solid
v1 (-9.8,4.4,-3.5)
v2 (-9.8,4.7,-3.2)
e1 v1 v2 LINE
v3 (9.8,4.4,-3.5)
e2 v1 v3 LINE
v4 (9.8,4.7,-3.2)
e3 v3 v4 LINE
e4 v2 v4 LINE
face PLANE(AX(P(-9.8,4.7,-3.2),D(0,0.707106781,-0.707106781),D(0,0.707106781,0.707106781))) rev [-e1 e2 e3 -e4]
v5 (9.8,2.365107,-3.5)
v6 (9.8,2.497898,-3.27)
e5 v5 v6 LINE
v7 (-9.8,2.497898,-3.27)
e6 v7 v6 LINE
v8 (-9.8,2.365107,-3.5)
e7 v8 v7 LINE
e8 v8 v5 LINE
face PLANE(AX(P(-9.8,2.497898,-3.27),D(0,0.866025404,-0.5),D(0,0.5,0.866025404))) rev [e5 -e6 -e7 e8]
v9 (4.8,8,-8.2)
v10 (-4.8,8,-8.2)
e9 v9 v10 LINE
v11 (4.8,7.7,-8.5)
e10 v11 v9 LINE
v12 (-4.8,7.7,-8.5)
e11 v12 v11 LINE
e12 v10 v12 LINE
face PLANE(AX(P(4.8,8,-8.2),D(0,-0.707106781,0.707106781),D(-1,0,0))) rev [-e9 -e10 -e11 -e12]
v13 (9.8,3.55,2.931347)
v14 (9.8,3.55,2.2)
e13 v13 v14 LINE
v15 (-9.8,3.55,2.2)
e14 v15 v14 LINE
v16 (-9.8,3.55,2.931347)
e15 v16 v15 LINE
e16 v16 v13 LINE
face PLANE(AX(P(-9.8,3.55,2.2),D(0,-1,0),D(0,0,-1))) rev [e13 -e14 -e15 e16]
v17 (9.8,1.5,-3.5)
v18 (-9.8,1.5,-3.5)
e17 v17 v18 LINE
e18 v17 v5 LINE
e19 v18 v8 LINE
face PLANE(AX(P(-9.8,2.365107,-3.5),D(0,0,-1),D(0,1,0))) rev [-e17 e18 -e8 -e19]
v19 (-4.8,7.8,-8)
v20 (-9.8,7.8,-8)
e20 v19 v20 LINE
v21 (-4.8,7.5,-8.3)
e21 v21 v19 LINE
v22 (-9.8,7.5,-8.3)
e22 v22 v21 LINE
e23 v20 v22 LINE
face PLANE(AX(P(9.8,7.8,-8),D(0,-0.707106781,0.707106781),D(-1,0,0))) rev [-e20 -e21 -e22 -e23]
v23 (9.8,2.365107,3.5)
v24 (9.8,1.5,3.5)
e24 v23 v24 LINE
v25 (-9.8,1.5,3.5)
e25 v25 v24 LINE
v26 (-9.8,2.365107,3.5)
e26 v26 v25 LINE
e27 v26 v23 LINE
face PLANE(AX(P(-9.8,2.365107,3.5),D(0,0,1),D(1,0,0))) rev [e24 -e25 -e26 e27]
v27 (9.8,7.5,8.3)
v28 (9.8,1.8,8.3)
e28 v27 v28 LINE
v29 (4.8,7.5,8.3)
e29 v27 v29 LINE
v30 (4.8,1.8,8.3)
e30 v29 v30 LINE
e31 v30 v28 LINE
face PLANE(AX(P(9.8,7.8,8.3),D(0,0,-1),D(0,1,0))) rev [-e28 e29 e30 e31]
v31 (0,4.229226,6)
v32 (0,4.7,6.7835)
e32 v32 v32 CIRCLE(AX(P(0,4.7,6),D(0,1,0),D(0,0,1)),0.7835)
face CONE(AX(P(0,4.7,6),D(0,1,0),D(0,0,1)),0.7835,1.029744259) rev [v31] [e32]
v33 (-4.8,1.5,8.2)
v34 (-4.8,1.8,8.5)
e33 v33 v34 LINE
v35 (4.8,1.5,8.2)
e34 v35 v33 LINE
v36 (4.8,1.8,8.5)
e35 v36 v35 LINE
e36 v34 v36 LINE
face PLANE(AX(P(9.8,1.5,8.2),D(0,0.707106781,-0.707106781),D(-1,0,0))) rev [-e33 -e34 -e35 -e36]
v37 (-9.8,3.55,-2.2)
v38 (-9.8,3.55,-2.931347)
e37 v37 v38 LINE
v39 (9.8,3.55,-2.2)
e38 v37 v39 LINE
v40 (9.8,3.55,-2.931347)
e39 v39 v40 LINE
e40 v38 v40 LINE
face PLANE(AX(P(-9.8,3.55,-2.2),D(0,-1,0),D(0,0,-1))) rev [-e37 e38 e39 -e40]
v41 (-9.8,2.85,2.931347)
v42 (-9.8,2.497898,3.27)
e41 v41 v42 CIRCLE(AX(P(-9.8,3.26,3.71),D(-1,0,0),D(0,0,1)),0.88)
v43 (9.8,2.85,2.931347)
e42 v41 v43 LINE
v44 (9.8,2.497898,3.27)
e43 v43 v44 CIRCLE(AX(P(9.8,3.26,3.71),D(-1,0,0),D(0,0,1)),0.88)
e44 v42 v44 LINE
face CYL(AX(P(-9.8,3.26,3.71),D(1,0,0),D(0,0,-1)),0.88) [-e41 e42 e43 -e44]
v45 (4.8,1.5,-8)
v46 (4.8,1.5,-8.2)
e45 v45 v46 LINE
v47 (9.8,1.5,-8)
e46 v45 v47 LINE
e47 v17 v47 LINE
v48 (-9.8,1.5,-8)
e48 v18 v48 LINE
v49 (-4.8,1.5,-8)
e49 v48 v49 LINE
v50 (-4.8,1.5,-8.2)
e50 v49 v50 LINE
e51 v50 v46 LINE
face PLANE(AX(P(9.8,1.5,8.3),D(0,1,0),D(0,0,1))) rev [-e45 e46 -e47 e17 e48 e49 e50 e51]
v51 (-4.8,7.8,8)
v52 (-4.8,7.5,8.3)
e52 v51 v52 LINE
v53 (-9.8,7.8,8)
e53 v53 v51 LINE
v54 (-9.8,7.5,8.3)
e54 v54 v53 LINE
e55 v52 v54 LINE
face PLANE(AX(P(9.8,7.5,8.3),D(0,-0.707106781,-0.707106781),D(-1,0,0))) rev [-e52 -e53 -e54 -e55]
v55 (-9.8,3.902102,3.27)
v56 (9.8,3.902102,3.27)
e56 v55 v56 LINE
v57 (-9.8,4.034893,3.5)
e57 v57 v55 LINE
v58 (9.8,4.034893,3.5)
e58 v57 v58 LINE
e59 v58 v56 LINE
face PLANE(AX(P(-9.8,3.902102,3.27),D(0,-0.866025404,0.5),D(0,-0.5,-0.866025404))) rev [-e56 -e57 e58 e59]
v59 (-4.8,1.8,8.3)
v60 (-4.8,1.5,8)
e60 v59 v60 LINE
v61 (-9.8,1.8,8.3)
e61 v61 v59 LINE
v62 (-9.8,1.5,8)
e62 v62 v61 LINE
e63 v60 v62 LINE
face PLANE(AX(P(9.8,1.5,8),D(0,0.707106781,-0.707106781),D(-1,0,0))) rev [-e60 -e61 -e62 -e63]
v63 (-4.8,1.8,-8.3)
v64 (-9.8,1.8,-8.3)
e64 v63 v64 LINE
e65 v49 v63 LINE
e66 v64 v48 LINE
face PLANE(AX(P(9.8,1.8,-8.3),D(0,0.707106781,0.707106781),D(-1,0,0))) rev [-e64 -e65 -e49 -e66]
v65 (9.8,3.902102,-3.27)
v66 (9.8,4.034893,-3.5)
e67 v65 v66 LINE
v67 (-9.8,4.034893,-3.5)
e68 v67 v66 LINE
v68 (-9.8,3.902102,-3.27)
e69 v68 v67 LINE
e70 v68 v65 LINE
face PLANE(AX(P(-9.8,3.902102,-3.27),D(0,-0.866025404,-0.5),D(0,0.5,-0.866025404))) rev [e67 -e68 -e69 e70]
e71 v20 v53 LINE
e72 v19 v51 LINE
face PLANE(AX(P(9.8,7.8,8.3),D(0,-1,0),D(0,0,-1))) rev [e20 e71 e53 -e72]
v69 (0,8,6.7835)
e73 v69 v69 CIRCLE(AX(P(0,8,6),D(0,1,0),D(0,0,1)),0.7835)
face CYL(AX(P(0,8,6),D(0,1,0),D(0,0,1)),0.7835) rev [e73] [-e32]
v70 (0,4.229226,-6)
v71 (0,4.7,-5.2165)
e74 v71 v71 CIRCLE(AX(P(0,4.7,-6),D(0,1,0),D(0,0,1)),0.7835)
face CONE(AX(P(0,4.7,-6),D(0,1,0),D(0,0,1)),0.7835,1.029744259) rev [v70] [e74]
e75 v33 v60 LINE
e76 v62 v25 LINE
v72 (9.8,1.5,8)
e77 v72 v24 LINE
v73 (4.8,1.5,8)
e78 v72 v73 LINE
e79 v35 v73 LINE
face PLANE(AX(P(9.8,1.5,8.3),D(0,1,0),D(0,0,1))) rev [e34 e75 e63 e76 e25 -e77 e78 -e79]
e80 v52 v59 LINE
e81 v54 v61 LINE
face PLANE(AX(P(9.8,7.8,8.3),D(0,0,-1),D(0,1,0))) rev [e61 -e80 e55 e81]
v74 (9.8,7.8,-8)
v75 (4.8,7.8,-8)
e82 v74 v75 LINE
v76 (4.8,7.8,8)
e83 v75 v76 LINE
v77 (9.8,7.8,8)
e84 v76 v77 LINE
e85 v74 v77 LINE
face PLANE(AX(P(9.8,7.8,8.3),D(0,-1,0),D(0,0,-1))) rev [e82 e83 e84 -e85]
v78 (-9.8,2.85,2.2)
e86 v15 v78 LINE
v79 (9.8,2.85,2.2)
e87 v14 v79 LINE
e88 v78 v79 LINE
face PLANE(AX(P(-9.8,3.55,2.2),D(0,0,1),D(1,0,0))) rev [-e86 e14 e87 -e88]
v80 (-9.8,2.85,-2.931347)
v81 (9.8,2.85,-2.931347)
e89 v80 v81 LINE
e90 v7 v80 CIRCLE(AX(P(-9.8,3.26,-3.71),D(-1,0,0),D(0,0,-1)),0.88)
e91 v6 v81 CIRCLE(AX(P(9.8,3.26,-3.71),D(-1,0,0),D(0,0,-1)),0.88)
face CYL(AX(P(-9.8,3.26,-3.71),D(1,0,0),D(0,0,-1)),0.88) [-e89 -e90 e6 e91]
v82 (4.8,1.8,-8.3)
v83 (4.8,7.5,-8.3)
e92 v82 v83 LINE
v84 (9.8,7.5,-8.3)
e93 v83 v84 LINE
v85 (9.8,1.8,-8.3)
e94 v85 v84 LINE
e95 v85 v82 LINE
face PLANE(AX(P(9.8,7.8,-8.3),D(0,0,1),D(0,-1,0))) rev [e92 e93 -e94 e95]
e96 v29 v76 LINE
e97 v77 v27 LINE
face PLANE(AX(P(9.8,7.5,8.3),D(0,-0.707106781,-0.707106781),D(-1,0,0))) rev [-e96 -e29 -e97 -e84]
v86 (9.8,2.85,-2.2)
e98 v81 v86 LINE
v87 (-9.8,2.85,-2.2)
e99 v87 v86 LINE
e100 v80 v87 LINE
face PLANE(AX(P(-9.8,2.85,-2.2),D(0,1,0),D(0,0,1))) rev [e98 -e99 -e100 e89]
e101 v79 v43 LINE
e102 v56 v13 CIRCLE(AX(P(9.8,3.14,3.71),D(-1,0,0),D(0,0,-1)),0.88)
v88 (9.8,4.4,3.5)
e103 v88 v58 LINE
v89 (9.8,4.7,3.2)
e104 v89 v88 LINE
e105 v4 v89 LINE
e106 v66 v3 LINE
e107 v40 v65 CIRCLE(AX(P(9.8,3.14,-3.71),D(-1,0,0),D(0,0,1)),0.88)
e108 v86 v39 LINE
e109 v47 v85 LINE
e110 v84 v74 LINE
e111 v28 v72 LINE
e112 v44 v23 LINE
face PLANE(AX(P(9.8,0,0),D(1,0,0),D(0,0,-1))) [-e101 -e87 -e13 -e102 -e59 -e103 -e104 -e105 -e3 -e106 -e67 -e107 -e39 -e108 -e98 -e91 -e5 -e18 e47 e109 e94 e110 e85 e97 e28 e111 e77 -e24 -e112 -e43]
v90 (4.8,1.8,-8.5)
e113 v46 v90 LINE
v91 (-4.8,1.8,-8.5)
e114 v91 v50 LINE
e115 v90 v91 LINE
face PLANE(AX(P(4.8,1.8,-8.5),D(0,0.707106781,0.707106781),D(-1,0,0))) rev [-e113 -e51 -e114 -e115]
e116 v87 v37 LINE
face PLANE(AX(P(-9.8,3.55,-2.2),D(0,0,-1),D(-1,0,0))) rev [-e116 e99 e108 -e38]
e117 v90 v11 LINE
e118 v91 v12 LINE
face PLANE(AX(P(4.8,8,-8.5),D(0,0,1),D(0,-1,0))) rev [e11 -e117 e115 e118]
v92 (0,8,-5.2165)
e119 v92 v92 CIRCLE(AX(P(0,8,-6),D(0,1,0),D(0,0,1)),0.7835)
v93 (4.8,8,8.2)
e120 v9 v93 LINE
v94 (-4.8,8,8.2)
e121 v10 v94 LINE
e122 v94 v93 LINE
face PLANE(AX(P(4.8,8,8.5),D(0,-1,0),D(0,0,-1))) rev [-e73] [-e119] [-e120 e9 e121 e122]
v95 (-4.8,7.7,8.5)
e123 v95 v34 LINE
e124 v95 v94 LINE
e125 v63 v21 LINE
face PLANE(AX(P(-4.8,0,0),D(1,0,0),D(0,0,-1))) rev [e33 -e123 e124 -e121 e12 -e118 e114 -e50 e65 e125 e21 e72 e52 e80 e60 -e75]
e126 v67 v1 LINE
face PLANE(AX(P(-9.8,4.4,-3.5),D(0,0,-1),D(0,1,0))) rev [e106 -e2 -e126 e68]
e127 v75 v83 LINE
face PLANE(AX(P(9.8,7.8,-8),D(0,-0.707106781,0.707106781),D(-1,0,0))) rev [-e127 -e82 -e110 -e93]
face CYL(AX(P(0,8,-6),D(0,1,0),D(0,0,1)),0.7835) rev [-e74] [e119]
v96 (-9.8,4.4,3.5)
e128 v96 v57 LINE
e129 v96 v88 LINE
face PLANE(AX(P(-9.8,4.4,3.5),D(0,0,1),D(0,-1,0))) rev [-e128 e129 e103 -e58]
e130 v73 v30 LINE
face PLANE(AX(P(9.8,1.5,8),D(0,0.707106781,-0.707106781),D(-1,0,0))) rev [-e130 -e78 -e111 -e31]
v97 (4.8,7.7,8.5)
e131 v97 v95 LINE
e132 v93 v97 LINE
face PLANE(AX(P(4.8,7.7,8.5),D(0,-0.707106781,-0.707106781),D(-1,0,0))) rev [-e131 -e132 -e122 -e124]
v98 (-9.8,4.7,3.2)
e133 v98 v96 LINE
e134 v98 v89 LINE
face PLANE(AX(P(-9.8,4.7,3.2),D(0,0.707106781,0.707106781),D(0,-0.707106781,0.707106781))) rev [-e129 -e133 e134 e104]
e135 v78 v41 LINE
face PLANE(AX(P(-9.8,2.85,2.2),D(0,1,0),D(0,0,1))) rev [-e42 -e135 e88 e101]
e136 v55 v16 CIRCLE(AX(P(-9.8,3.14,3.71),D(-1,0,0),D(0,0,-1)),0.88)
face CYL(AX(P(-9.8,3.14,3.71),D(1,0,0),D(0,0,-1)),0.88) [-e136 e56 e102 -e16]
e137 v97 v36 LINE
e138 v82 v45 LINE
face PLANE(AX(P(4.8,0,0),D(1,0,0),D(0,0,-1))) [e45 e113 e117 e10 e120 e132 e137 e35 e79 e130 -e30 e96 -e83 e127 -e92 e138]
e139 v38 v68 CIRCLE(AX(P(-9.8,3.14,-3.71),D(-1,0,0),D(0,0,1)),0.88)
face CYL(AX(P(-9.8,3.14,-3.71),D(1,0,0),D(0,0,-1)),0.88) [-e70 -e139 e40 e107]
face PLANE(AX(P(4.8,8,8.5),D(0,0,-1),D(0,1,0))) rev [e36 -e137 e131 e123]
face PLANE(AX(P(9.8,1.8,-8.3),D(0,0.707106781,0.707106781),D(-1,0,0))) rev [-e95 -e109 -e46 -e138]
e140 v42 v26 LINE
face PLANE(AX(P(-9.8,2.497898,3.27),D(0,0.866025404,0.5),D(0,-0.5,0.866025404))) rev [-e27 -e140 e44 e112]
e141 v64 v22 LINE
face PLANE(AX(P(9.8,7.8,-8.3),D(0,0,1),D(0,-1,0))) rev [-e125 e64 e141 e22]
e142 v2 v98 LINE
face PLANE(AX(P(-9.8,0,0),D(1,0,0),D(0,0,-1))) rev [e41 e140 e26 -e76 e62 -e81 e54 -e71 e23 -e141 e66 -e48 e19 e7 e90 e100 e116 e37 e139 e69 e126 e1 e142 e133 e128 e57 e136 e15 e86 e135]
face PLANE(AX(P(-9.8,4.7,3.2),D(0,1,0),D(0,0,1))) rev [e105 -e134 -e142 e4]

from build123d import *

# Parameters (mm, degrees)
SKETCH1_W               = 16.6
SKETCH1_H               = 6.3
BOSS_EXTRUDE1_DEPTH     = 9.8
SKETCH2_W               = 17
SKETCH2_H               = 6.5
BOSS_EXTRUDE2_DEPTH     = 4.8
CUT_EXTRUDE2_DEPTH      = 16.241062955
CUT_EXTRUDE2_DEPTH_BACK = 16.241062955
CHAMFER1_SIZE           = 0.3
CHAMFER2_SIZE           = 0.3
CHAMFER3_SIZE           = 0.3
CHAMFER4_SIZE           = 0.3
LPATTERN1_COUNT         = 2
LPATTERN1_PITCH         = 12


with BuildPart() as part:
    # Sketch1 → Boss-Extrude1 (new, symmetric)
    with BuildSketch(Plane(origin=(0, 0, 0), x_dir=(0, 0, -1), z_dir=(1, 0, 0))):
        with Locations((0, 4.65)):
            Rectangle(SKETCH1_W, SKETCH1_H)
    extrude(amount=BOSS_EXTRUDE1_DEPTH, both=True)

    # Sketch2 → Boss-Extrude2 (add, symmetric)
    with BuildSketch(Plane(origin=(0, 0, 0), x_dir=(0, 0, -1), z_dir=(1, 0, 0))):
        with Locations((0, 4.75)):
            Rectangle(SKETCH2_W, SKETCH2_H)
    extrude(amount=BOSS_EXTRUDE2_DEPTH, both=True)

    # Sketch3 → Cut-Extrude2 (cut, two sides: drawn at the far end of the back side and taken through both)
    with BuildSketch(Plane(origin=(0, 0, 0), x_dir=(0, 0, -1), z_dir=(1, 0, 0)).offset(-CUT_EXTRUDE2_DEPTH_BACK)):
        with BuildLine():
            Line((-3.2, 4.7), (3.2, 4.7))
            Line((3.2, 4.7), (3.5, 4.4))
            Line((3.5, 4.4), (3.5, 4.034892917))
            Line((3.5, 4.034892917), (3.27, 3.902102355))
            ThreePointArc((3.27, 3.902102355), (3.075750359, 3.750022453), (2.931347317, 3.55))
            Line((2.931347317, 3.55), (2.2, 3.55))
            Line((2.2, 3.55), (2.2, 2.85))
            Line((2.2, 2.85), (2.931347317, 2.85))
            ThreePointArc((2.931347317, 2.85), (3.075750359, 2.649977547), (3.27, 2.497897645))
            Line((3.27, 2.497897645), (3.5, 2.365107083))
            Line((3.5, 2.365107083), (3.5, 0))
            Line((3.5, 0), (-3.5, 0))
            Line((-3.5, 0), (-3.5, 2.365107083))
            Line((-3.5, 2.365107083), (-3.27, 2.497897645))
            ThreePointArc((-3.27, 2.497897645), (-3.075750359, 2.649977547), (-2.931347317, 2.85))
            Line((-2.931347317, 2.85), (-2.2, 2.85))
            Line((-2.2, 2.85), (-2.2, 3.55))
            Line((-2.2, 3.55), (-2.931347317, 3.55))
            ThreePointArc((-2.931347317, 3.55), (-3.075750359, 3.750022453), (-3.27, 3.902102355))
            Line((-3.27, 3.902102355), (-3.5, 4.034892917))
            Line((-3.5, 4.034892917), (-3.5, 4.4))
            Line((-3.5, 4.4), (-3.2, 4.7))
        make_face()
    extrude(amount=CUT_EXTRUDE2_DEPTH + CUT_EXTRUDE2_DEPTH_BACK, mode=Mode.SUBTRACT)

    # Chamfer1
    chamfer1_edges = [part.edges().sort_by_distance(p)[0] for p in [
        (-7.3, 7.8, 8.3),
        (-7.3, 7.8, -8.3),
        (7.3, 7.8, 8.3),
        (7.3, 7.8, -8.3),
    ]]
    chamfer(chamfer1_edges, length=CHAMFER1_SIZE)

    # Chamfer2
    chamfer2_edges = [part.edges().sort_by_distance(p)[0] for p in [
        (0, 8, 8.5),
        (0, 8, -8.5),
    ]]
    chamfer(chamfer2_edges, length=CHAMFER2_SIZE)

    # Chamfer3
    chamfer3_edges = [part.edges().sort_by_distance(p)[0] for p in [
        (-7.3, 1.5, -8.3),
        (-7.3, 1.5, 8.3),
        (7.3, 1.5, -8.3),
        (7.3, 1.5, 8.3),
    ]]
    chamfer(chamfer3_edges, length=CHAMFER3_SIZE)

    # Chamfer4
    chamfer4_edges = [part.edges().sort_by_distance(p)[0] for p in [
        (0, 1.5, 8.5),
        (0, 1.5, -8.5),
    ]]
    chamfer(chamfer4_edges, length=CHAMFER4_SIZE)

    # Sketch4 → Tap1 (revolve, cut)
    with BuildSketch(Plane(origin=(0, 8, -6), x_dir=(0, 0, 1), z_dir=(1, 0, 0))):
        Polygon((0, 0), (0, 3.770774295), (0.7835, 3.3), (0.7835, 0), align=None)
    tap1 = revolve(axis=Axis((0, 8, -6), (0, -1, 0)), mode=Mode.SUBTRACT)

    # LPattern1: Tap1 ×2
    with Locations(*[(0, 0, i * LPATTERN1_PITCH) for i in range(1, LPATTERN1_COUNT)]):
        add(tap1, mode=Mode.SUBTRACT)


solid = part.part
